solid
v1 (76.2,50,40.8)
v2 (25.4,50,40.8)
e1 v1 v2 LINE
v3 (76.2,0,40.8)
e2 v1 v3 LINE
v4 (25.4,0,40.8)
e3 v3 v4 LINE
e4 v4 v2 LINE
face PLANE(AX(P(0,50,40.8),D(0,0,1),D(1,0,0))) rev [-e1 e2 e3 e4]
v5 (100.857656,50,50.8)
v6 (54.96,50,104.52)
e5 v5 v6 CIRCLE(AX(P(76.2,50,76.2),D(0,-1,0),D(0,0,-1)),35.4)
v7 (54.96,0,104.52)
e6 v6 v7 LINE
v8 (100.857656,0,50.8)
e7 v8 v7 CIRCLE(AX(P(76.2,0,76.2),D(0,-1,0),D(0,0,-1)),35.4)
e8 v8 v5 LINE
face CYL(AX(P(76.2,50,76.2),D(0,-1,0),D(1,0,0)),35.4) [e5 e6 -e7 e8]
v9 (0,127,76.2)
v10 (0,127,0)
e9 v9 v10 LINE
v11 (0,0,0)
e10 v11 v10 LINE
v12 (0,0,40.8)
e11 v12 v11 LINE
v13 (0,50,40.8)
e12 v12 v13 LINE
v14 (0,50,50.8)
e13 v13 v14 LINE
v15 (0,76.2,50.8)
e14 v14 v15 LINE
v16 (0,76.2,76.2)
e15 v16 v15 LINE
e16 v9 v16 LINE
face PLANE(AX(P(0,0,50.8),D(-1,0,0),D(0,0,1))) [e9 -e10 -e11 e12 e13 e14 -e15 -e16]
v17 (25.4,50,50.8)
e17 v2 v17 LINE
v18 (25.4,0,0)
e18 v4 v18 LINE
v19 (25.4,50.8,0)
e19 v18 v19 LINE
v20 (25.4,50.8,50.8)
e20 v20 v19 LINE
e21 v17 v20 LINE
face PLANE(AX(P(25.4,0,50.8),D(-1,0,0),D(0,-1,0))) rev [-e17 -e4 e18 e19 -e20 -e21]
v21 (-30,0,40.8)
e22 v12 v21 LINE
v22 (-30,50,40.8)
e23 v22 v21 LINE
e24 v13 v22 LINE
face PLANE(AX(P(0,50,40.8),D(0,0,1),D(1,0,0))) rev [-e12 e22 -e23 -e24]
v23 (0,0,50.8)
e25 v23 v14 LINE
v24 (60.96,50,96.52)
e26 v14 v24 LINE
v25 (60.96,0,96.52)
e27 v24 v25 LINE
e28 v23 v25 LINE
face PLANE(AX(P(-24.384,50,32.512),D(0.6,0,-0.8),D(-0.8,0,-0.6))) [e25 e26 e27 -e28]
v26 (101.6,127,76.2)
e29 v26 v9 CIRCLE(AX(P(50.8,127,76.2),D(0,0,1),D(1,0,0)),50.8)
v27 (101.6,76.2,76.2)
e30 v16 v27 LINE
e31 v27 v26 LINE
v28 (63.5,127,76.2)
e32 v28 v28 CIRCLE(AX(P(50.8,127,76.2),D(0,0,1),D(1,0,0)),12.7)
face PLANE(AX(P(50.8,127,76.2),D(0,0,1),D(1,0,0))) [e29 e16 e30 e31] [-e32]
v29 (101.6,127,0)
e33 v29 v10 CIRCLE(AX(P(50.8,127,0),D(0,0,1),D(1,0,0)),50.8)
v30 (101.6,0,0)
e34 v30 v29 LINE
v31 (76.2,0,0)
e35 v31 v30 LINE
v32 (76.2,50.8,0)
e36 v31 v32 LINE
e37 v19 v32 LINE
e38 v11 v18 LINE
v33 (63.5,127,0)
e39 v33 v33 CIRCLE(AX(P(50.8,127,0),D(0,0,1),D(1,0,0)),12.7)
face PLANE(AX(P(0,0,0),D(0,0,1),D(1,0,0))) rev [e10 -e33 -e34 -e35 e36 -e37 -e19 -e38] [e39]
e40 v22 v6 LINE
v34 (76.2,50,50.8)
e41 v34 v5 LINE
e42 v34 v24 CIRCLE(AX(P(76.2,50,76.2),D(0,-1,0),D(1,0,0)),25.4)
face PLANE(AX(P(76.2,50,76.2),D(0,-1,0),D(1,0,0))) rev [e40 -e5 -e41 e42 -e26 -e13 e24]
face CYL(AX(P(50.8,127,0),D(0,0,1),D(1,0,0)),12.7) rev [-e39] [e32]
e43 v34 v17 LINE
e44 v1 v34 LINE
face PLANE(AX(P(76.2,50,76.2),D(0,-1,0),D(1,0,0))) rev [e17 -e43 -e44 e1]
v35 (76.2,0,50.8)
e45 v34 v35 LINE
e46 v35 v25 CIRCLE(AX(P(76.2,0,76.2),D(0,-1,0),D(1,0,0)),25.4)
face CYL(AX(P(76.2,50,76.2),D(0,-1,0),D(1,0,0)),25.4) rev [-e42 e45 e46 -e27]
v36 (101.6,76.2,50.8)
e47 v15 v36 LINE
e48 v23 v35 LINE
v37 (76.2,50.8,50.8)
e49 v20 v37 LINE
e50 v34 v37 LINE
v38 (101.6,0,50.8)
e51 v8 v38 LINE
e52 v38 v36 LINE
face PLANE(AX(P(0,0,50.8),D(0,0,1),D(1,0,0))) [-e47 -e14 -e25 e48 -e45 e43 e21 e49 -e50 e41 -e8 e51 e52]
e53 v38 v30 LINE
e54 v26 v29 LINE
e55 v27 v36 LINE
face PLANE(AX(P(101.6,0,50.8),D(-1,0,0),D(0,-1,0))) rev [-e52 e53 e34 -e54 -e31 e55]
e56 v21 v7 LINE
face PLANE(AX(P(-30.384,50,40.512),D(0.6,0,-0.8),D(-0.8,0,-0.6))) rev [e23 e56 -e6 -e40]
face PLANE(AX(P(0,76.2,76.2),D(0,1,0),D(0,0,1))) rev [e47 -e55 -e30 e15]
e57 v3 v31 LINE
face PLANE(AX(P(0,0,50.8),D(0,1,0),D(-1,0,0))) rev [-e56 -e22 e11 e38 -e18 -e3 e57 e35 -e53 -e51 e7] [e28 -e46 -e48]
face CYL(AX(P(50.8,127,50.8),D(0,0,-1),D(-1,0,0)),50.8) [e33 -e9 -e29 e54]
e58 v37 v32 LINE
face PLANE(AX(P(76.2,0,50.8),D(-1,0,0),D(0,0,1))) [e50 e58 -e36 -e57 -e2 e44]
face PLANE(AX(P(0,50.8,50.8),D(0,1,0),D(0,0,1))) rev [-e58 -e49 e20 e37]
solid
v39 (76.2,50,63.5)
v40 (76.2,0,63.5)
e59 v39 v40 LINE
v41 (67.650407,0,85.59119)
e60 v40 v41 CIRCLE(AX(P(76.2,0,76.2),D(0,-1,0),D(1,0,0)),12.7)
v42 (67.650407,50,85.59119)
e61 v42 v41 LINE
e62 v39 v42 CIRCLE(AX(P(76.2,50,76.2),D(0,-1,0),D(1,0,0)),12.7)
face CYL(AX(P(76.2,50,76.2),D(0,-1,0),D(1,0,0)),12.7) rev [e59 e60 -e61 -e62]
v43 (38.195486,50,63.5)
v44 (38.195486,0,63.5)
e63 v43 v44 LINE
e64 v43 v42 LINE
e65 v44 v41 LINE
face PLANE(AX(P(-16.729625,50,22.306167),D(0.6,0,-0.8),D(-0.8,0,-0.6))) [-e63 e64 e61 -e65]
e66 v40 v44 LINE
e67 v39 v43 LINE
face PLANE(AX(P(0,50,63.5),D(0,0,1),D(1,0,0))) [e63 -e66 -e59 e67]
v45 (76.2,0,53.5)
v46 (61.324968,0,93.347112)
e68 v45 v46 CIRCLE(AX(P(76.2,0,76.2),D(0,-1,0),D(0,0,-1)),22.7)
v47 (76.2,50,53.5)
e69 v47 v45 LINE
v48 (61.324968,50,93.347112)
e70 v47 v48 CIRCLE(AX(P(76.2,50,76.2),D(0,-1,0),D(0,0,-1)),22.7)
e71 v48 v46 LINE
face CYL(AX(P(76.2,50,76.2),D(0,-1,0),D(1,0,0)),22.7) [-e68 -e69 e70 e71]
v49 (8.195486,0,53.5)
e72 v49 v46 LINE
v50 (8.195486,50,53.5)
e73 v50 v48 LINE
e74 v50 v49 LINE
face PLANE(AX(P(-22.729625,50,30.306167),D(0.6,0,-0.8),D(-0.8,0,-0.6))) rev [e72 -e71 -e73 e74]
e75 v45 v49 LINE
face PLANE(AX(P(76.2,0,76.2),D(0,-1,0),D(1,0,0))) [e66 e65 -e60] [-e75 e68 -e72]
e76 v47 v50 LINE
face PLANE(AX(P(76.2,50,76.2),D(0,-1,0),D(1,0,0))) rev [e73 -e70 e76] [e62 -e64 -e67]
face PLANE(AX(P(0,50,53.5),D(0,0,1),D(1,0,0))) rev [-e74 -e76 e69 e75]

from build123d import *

# Parameters (mm, degrees)
BOSS_EXTRUDE2_DEPTH      = 50.8
BOSS_EXTRUDE3_DEPTH      = 25.4
SKETCH4_R                = 12.7
CUT_EXTRUDE2_DEPTH       = 219.499061783
EXTRUDE_THIN14_START     = -50
EXTRUDE_THIN14_OUTLINE_W = 50.8
EXTRUDE_THIN14_OUTLINE_H = 10
EXTRUDE_THIN14_DEPTH     = 50


# Read off the part's stored shape, not the designer's step: Extrude-Thin14
with BuildPart() as part:
    # Sketch1 → Boss-Extrude2 (new body)
    with BuildSketch(Plane.XY):
        with BuildLine():
            Line((0, 127), (0, 0))
            Line((0, 0), (25.4, 0))
            Line((25.4, 0), (25.4, 50.8))
            Line((25.4, 50.8), (76.2, 50.8))
            Line((76.2, 50.8), (76.2, 0))
            Line((76.2, 0), (101.6, 0))
            Line((101.6, 0), (101.6, 127))
            ThreePointArc((101.6, 127), (50.8, 177.8), (0, 127))
        make_face()
    extrude(amount=BOSS_EXTRUDE2_DEPTH)

    # Sketch3 → Boss-Extrude3 (add)
    with BuildSketch(Plane.XY.offset(50.8)):
        with BuildLine():
            Line((0, 127), (0, 76.2))
            Line((0, 76.2), (101.6, 76.2))
            Line((101.6, 76.2), (101.6, 127))
            ThreePointArc((101.6, 127), (50.8, 177.8), (0, 127))
        make_face()
    extrude(amount=BOSS_EXTRUDE3_DEPTH)

    # Sketch4 → Cut-Extrude2 (cut, through all)
    with BuildSketch(Plane.XY.offset(76.2)):
        with Locations((50.8, 127)):
            Circle(SKETCH4_R)
    extrude(amount=-CUT_EXTRUDE2_DEPTH, mode=Mode.SUBTRACT)

    # Extrude-Thin14 outline → Extrude-Thin14 (add)
    # profile 1 of 3: a face of its own
    with BuildSketch(Plane.XZ.offset(EXTRUDE_THIN14_START)):
        with BuildLine():
            Line((8.195486321, 53.5), (76.2, 53.5))
            ThreePointArc((76.2, 53.5), (97.466516312, 84.138846513), (61.324968382, 93.347111546))
            Line((61.324968382, 93.347111546), (8.195486321, 53.5))
        make_face()
        with BuildLine():
            ThreePointArc((67.650406883, 85.591190422), (88.043946098, 80.783769281), (76.2, 63.5))
            Line((76.2, 63.5), (38.195486321, 63.5))
            Line((38.195486321, 63.5), (67.650406883, 85.591190422))
        make_face(mode=Mode.SUBTRACT)
    # profile 2 of 3: a face of its own
    with BuildSketch(Plane.XZ.offset(EXTRUDE_THIN14_START)):
        with BuildLine():
            Line((76.2, 50.8), (100.857656012, 50.8))
            ThreePointArc((100.857656012, 50.8), (103.114302762, 99.195223566), (54.96, 104.52))
            Line((54.96, 104.52), (-30, 40.8))
            Line((-30, 40.8), (0, 40.8))
            Line((0, 40.8), (0, 50.8))
            Line((0, 50.8), (60.96, 96.52))
            ThreePointArc((60.96, 96.52), (100.29655577, 84.232185257), (76.2, 50.8))
        make_face()
    # profile 3 of 3: a face of its own
    with BuildSketch(Plane.XZ.offset(EXTRUDE_THIN14_START)):
        with Locations((50.8, 45.8)):
            Rectangle(EXTRUDE_THIN14_OUTLINE_W, EXTRUDE_THIN14_OUTLINE_H)
    extrude(amount=EXTRUDE_THIN14_DEPTH)


solid = part.part
